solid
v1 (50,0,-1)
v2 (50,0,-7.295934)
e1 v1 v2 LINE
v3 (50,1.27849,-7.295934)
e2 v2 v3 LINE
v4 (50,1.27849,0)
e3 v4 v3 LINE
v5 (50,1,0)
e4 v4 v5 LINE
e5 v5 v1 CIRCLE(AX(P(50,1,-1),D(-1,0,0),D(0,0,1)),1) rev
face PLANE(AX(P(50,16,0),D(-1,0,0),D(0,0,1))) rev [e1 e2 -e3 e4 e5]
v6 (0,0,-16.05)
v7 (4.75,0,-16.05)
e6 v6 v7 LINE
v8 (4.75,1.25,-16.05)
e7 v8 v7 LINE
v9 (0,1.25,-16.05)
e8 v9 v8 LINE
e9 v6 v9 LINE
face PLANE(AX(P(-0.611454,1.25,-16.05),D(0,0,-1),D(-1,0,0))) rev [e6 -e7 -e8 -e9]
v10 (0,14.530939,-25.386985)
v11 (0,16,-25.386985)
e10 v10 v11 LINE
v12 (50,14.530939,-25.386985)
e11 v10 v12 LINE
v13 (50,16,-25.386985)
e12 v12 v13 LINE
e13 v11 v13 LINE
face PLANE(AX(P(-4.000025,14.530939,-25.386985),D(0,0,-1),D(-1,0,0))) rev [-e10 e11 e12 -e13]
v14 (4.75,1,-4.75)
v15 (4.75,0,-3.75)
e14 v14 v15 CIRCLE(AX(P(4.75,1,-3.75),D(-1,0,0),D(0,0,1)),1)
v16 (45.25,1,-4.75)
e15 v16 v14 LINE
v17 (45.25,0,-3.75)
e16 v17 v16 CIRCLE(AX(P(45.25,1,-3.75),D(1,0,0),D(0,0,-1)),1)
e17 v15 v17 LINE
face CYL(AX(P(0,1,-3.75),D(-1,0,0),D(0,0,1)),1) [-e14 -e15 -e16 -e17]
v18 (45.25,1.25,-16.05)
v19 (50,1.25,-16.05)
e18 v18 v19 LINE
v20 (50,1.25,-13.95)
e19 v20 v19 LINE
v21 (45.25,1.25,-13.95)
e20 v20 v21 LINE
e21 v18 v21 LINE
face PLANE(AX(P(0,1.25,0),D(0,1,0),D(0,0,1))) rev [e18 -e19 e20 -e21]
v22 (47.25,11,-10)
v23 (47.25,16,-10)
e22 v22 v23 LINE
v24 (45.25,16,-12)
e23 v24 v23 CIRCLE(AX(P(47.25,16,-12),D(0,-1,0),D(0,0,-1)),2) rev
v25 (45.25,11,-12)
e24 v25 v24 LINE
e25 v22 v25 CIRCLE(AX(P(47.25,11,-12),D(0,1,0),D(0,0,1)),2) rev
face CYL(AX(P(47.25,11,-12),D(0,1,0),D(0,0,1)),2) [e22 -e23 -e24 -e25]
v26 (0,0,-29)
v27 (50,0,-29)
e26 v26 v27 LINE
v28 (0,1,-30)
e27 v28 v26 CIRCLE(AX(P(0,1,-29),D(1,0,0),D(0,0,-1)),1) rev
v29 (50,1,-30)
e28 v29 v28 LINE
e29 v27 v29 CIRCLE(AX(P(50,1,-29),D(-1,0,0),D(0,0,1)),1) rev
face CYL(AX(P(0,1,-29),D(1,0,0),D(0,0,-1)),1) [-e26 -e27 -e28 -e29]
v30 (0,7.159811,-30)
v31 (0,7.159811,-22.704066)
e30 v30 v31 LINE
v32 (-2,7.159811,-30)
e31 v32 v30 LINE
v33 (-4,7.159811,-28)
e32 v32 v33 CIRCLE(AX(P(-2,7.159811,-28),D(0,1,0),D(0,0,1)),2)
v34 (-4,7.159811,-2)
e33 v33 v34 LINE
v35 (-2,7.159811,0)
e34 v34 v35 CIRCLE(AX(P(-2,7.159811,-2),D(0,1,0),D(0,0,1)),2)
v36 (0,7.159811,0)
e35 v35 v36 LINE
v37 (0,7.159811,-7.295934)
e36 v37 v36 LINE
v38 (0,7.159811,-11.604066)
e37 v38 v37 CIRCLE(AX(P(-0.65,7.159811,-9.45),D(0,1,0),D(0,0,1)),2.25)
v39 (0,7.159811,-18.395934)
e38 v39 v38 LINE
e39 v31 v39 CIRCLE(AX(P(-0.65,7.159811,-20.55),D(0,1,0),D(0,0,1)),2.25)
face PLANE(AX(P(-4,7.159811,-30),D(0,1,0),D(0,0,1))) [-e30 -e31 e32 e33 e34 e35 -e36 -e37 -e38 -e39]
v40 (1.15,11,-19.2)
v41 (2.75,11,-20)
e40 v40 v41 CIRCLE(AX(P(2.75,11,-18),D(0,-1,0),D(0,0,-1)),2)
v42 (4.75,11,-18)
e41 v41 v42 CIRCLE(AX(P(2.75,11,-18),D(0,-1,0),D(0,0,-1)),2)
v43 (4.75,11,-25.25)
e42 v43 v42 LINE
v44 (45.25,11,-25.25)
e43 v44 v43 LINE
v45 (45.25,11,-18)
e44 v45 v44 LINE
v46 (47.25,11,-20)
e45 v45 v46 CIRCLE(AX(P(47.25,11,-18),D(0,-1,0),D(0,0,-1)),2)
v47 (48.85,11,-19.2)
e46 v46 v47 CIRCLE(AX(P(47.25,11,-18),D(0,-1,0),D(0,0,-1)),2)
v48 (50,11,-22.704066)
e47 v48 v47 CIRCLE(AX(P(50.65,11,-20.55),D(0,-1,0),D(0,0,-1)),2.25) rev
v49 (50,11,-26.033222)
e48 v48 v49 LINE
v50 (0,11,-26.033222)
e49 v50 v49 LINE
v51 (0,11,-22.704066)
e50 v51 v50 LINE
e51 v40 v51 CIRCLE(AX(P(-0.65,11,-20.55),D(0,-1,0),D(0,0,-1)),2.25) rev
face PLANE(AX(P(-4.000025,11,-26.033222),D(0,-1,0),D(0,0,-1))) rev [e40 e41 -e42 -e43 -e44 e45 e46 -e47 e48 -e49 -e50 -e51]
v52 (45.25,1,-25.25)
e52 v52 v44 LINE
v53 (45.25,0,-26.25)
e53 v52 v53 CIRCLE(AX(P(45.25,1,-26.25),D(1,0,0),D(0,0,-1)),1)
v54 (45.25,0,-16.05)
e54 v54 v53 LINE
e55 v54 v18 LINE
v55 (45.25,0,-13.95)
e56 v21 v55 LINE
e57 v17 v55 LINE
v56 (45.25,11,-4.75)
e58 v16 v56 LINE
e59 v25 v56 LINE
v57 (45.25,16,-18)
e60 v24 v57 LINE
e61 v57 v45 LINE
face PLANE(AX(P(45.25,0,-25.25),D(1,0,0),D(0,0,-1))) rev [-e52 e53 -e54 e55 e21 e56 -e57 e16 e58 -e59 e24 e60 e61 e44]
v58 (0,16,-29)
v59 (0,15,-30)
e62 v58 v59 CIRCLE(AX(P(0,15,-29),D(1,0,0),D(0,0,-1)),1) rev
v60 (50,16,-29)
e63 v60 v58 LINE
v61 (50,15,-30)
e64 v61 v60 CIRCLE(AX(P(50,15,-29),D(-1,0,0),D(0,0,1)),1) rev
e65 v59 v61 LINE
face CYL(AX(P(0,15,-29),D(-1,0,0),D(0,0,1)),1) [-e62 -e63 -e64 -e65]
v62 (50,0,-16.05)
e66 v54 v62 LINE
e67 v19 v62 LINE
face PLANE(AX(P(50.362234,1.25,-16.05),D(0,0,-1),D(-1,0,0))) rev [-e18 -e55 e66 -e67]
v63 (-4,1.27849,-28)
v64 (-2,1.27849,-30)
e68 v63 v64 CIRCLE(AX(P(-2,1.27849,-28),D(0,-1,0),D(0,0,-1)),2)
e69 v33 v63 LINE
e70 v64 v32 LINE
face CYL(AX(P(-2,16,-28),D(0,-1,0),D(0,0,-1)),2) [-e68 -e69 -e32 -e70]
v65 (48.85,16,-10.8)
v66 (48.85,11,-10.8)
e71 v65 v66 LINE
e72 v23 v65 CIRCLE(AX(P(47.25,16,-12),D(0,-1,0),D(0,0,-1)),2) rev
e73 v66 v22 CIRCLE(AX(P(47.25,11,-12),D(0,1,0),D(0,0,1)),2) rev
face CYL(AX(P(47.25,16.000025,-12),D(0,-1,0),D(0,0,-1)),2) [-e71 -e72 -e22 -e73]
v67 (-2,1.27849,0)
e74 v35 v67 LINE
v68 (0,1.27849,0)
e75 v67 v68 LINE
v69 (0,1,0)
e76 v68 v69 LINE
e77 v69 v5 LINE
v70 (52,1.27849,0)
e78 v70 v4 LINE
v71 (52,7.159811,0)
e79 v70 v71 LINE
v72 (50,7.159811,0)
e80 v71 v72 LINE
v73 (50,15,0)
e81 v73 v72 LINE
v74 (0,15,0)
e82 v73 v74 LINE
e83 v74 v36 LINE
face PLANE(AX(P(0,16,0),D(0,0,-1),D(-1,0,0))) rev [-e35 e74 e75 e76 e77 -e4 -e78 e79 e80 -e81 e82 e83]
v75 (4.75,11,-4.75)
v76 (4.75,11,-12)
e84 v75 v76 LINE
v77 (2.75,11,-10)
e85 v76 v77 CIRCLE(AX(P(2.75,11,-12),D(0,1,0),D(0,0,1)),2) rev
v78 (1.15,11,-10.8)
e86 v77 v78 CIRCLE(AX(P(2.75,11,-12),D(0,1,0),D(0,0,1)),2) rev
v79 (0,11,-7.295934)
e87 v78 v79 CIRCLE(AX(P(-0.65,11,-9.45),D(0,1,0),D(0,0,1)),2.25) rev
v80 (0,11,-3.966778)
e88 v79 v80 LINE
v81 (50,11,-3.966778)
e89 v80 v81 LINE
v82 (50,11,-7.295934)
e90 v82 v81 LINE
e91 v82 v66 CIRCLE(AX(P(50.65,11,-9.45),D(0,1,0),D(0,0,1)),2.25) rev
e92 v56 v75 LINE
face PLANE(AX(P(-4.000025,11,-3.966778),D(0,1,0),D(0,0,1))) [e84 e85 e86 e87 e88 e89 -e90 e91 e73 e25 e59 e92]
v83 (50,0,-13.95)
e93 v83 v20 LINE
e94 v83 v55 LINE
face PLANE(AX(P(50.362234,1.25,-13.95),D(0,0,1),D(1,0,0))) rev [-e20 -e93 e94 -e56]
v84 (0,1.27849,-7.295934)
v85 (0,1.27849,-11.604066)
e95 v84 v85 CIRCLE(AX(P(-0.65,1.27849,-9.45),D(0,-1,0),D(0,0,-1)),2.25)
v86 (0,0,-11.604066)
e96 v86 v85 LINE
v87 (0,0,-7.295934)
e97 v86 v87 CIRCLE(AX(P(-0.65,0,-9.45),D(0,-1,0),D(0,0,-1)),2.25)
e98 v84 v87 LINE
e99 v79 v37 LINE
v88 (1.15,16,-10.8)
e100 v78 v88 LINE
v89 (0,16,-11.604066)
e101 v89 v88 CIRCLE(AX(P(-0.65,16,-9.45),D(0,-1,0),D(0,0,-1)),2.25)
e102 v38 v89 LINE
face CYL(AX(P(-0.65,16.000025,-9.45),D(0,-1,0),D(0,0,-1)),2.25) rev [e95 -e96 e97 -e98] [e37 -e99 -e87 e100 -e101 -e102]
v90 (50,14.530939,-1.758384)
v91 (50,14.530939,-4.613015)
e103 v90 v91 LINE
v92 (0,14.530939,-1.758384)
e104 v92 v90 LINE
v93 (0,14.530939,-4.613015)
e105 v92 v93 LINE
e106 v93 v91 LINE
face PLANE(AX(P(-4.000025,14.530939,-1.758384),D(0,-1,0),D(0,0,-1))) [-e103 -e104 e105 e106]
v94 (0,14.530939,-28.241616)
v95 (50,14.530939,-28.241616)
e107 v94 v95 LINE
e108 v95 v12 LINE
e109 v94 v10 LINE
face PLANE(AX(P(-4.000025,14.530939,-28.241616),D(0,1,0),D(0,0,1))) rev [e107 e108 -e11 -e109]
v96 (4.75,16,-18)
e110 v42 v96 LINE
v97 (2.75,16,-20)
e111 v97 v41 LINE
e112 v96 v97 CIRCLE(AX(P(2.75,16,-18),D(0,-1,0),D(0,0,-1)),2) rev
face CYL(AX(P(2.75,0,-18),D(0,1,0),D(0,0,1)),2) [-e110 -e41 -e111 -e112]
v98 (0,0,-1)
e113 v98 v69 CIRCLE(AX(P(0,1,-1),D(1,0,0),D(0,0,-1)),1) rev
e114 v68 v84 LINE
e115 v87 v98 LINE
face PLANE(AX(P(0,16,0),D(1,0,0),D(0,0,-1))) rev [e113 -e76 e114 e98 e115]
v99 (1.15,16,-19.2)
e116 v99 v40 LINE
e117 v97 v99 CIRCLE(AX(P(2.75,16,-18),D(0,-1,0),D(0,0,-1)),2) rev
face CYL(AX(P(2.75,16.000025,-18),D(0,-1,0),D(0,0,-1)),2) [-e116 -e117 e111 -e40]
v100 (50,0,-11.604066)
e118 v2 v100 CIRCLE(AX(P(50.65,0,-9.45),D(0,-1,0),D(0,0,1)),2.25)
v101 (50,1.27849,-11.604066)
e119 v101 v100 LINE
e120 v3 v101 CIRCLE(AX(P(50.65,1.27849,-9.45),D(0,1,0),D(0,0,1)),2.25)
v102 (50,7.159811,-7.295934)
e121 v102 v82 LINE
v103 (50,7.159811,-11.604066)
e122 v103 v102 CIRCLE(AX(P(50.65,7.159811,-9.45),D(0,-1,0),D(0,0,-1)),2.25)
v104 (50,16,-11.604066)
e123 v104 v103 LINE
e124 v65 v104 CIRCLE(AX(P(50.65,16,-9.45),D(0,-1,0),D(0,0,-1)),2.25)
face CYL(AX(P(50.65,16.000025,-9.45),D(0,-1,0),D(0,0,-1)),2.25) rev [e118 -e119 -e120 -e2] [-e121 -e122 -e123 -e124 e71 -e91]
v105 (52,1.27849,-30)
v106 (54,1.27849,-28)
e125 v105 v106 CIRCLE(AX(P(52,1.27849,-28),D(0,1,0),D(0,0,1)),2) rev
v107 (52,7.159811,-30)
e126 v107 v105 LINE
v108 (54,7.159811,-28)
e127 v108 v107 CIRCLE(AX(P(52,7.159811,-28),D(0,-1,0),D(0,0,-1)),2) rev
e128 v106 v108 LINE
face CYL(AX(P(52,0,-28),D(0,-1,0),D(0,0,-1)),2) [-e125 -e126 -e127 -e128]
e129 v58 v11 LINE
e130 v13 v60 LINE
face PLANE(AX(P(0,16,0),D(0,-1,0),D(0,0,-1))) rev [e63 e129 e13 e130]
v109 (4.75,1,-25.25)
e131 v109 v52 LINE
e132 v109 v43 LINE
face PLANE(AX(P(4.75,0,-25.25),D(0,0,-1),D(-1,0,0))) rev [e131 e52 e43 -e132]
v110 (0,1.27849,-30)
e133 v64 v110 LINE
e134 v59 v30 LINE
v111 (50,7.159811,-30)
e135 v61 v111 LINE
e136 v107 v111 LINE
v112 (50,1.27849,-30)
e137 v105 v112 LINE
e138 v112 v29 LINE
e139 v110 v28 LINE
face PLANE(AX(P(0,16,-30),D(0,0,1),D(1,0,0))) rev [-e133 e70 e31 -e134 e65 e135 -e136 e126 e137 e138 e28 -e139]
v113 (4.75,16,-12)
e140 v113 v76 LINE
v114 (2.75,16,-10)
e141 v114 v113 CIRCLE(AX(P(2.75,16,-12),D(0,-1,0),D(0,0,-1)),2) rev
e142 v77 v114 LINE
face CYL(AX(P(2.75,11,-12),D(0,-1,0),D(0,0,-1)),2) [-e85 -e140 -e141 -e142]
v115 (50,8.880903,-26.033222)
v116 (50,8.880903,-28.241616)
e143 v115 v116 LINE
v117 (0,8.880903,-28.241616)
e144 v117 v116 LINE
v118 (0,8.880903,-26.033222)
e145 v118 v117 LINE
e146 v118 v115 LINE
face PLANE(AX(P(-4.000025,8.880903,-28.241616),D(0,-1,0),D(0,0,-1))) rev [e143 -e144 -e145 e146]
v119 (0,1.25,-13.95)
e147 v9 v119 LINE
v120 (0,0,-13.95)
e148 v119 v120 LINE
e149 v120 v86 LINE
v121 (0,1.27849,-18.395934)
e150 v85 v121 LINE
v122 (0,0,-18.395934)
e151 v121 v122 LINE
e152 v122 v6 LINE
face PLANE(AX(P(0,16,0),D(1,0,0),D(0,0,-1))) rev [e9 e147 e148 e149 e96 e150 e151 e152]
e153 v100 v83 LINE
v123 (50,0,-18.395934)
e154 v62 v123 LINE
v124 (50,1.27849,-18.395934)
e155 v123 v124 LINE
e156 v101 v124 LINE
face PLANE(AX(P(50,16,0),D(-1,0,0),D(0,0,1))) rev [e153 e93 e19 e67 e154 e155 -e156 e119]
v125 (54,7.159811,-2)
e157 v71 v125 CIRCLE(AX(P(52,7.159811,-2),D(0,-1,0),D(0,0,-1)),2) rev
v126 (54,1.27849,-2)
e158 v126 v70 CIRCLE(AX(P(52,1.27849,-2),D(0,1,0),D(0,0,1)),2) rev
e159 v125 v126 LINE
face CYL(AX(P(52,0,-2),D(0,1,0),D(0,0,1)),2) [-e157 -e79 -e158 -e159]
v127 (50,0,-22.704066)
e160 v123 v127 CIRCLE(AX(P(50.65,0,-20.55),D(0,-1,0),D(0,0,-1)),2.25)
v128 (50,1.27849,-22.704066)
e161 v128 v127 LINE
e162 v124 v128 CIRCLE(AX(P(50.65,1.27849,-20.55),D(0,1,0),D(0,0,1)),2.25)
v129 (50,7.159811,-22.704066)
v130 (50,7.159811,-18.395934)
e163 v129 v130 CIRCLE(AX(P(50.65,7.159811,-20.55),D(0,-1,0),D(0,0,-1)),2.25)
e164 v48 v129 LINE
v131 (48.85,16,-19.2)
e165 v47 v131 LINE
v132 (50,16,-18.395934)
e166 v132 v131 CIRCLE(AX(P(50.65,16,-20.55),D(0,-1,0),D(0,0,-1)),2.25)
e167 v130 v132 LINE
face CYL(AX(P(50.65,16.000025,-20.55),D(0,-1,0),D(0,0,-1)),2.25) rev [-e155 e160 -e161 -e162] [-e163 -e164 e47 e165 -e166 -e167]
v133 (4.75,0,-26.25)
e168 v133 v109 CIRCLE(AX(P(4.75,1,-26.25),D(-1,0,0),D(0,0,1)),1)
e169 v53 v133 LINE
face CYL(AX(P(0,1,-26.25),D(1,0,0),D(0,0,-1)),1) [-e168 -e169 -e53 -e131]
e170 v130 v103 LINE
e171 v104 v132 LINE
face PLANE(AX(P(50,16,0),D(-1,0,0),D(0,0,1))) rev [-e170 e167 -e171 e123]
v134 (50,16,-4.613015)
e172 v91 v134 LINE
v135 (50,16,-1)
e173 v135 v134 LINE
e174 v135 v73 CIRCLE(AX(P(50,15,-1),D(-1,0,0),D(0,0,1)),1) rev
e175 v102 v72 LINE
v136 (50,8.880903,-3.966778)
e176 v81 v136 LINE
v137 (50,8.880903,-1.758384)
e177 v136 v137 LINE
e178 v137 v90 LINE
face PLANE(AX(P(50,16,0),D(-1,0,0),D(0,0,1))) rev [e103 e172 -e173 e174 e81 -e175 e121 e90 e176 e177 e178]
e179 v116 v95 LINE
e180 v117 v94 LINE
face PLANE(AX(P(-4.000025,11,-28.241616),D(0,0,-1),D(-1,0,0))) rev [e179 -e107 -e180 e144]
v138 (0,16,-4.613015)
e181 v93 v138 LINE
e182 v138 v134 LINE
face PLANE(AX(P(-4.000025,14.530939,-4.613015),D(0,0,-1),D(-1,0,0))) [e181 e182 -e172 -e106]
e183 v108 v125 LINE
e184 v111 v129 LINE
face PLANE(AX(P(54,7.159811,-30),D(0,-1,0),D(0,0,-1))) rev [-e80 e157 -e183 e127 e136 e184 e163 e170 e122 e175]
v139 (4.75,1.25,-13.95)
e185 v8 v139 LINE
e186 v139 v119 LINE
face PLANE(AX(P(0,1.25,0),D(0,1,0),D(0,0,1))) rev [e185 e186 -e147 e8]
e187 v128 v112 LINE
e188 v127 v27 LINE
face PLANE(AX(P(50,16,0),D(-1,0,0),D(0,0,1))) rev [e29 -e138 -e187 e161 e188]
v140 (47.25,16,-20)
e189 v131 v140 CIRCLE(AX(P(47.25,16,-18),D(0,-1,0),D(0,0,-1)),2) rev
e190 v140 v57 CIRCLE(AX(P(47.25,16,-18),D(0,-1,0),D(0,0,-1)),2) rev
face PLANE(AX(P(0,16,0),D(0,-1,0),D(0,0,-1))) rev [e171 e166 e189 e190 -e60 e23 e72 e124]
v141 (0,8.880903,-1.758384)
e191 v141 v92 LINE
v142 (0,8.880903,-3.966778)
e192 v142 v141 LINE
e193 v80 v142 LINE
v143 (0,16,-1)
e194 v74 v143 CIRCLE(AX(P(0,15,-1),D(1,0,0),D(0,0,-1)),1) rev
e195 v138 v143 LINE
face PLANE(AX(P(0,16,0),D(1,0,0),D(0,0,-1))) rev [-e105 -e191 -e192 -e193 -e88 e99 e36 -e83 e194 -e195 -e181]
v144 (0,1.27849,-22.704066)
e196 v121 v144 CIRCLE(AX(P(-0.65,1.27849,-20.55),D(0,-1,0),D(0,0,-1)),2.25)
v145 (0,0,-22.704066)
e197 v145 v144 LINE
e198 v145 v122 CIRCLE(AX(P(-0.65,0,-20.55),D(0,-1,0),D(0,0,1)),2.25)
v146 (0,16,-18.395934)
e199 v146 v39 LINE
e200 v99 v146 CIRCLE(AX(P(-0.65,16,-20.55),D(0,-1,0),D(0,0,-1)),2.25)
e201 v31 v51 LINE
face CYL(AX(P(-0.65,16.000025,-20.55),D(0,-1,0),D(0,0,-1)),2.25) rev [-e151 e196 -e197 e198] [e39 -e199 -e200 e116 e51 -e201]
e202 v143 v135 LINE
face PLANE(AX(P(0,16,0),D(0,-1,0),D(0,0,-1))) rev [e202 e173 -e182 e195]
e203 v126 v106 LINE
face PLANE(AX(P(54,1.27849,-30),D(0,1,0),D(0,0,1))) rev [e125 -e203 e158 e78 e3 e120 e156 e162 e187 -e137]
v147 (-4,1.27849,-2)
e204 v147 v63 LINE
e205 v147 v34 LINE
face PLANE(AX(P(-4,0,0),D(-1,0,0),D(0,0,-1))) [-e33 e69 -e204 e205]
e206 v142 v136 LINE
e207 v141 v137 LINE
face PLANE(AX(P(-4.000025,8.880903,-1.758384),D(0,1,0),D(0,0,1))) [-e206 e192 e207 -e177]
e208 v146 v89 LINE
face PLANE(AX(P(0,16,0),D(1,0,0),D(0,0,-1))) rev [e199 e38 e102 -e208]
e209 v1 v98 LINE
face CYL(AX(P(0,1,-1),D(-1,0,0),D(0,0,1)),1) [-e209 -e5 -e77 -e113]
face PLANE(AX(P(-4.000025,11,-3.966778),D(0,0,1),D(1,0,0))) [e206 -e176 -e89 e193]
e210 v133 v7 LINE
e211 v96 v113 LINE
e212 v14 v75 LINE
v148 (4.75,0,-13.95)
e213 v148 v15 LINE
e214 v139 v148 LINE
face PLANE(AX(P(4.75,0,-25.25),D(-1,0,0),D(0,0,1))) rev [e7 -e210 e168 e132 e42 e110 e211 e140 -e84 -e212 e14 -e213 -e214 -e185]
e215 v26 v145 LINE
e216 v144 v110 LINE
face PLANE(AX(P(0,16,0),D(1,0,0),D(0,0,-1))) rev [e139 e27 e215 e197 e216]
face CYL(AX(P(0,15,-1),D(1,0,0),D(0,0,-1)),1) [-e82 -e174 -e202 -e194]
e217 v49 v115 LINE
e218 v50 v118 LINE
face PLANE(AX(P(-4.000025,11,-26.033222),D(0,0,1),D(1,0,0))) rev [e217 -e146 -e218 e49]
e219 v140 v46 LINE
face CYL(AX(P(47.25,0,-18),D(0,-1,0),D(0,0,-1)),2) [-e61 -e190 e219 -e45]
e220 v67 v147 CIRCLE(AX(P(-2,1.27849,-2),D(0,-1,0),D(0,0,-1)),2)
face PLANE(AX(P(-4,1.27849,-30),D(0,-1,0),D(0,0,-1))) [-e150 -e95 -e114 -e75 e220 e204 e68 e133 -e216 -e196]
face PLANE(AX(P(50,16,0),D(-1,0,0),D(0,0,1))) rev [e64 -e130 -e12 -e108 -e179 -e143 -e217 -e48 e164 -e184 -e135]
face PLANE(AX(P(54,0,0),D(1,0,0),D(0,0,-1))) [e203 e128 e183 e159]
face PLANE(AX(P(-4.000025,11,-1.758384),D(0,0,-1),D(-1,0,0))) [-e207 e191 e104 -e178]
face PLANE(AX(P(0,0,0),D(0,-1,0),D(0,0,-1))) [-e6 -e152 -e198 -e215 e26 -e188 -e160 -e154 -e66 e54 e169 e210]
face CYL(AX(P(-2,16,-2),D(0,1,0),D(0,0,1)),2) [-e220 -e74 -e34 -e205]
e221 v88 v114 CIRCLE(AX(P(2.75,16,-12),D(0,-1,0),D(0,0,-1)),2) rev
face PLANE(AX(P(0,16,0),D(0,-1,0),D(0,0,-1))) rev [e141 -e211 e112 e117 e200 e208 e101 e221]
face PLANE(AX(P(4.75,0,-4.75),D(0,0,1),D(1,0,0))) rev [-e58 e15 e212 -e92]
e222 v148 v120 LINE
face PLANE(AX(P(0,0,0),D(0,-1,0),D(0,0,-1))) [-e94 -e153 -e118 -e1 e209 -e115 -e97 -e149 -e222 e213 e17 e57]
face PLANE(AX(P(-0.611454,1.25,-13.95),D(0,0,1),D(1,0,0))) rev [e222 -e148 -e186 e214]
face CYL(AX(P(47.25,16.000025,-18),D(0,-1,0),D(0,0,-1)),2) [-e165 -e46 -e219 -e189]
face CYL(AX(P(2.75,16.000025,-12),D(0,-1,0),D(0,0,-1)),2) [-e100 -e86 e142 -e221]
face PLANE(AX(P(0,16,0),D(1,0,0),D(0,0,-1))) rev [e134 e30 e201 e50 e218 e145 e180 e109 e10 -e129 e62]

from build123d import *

# Parameters (mm, degrees)
SKETCH1_W           = 50
SKETCH1_H           = 30
BOSS_EXTRUDE1_DEPTH = 16
SKETCH2_W           = 40.5
SKETCH2_H           = 20.5
CUT_EXTRUDE1_DEPTH  = 61.464865831
SKETCH3_W           = 5.361453717
SKETCH3_H           = 2.1
SKETCH3_W_2         = 6
CUT_EXTRUDE2_DEPTH  = 1.25
SKETCH5_W           = 30
SKETCH5_H           = 5.881320982
BOSS_EXTRUDE2_DEPTH = 4
SKETCH4_R           = 2.25
CUT_EXTRUDE3_DEPTH  = 64.812224534
CUT_EXTRUDE4_DEPTH  = 64.812224534
FILLET1_R           = 1
FILLET2_R           = 2
FILLET3_R           = 2


with BuildPart() as part:
    # Sketch1 → Boss-Extrude1 (new body)
    with BuildSketch(Plane(origin=(0, 0, 0), x_dir=(1, 0, 0), z_dir=(0, 1, 0))):
        with Locations((25, 15)):
            Rectangle(SKETCH1_W, SKETCH1_H)
    extrude(amount=BOSS_EXTRUDE1_DEPTH)

    # Sketch2 → Cut-Extrude1 (cut, through all)
    with BuildSketch(Plane(origin=(0, 16, 0), x_dir=(1, 0, 0), z_dir=(0, 1, 0))):
        with Locations((25, 15)):
            Rectangle(SKETCH2_W, SKETCH2_H)
    extrude(amount=-CUT_EXTRUDE1_DEPTH, mode=Mode.SUBTRACT)

    # Sketch3 → Cut-Extrude2 (cut)
    with BuildSketch(Plane.XZ):
        with Locations((2.069273142, -15)):
            Rectangle(SKETCH3_W, SKETCH3_H)
        with Locations((47.362234217, -15)):
            Rectangle(SKETCH3_W_2, SKETCH3_H)
    extrude(amount=-CUT_EXTRUDE2_DEPTH, mode=Mode.SUBTRACT)

    # Sketch5 → Boss-Extrude2 (add)
    with BuildSketch(Plane(origin=(50, 0, 0), x_dir=(0, 0, -1), z_dir=(1, 0, 0))):
        with Locations((15, 4.219150797)):
            Rectangle(SKETCH5_W, SKETCH5_H)
    boss_extrude2 = extrude(amount=BOSS_EXTRUDE2_DEPTH)

    # Mirror1: Boss-Extrude2 across plane
    add(boss_extrude2.mirror(Plane(origin=(25, 0, 0), x_dir=(0, 0, 1), z_dir=(1, 0, 0))))

    # Sketch4 → Cut-Extrude3 (cut, through all)
    with BuildSketch(Plane.XZ):
        with Locations(Location((50.65, -20.55, 0), (0, 0, 253.208552885))):
            Circle(SKETCH4_R)
        with Locations(Location((-0.65, -20.55, 0), (0, 0, 286.791447115))):
            Circle(SKETCH4_R)
        with Locations(Location((50.65, -9.45, 0), (0, 0, 253.208552885))):
            Circle(SKETCH4_R)
        with Locations(Location((-0.65, -9.45, 0), (0, 0, 286.791447115))):
            Circle(SKETCH4_R)
    extrude(amount=-CUT_EXTRUDE3_DEPTH, mode=Mode.SUBTRACT)

    # Sketch7 → Cut-Extrude4 (cut, through all)
    with BuildSketch(Plane(origin=(50, 0, 0), x_dir=(0, 0, -1), z_dir=(1, 0, 0))):
        Polygon((26.03322218, 11), (20, 11), (20, 19.253471802), (25.386984847, 19.253471802), (25.386984847, 14.530939497), (28.241616166, 14.530939497), (28.241616166, 11), (28.241616166, 8.880902809), (26.03322218, 8.880902809), align=None)
    cut_extrude4 = extrude(amount=-CUT_EXTRUDE4_DEPTH, mode=Mode.SUBTRACT)

    # Mirror2: Cut-Extrude4 across plane
    add(cut_extrude4.mirror(Plane(origin=(0, 0, -15), x_dir=(1, 0, 0), z_dir=(0, 0, -1))), mode=Mode.SUBTRACT)

    # Fillet1
    fillet1_edges = [part.edges().sort_by_distance(p)[0] for p in [
        (25, 0, -30),
        (25, 0, 0),
        (25, 0, -4.75),
        (25, 0, -25.25),
        (25, 16, 0),
        (25, 16, -30),
    ]]
    fillet(fillet1_edges, radius=FILLET1_R)

    # Fillet2
    fillet2_edges = [part.edges().sort_by_distance(p)[0] for p in [
        (-4, 4.219150797, -30),
        (-4, 4.219150797, 0),
        (54, 4.219150797, 0),
        (54, 4.219150797, -30),
    ]]
    fillet(fillet2_edges, radius=FILLET2_R)

    # Fillet3
    fillet3_edges = [part.edges().sort_by_distance(p)[0] for p in [
        (1.531742423, 13.5, -10),
        (4.75, 13.5, -10),
        (1.531742423, 13.5, -20),
        (4.75, 13.5, -20),
        (45.25, 13.5, -10),
        (48.468257577, 13.5, -10),
        (45.25, 13.5, -20),
        (48.468257577, 13.5, -20),
    ]]
    fillet(fillet3_edges, radius=FILLET3_R - 0.0001)  # a hair under: the kernel refuses the full size


solid = part.part
